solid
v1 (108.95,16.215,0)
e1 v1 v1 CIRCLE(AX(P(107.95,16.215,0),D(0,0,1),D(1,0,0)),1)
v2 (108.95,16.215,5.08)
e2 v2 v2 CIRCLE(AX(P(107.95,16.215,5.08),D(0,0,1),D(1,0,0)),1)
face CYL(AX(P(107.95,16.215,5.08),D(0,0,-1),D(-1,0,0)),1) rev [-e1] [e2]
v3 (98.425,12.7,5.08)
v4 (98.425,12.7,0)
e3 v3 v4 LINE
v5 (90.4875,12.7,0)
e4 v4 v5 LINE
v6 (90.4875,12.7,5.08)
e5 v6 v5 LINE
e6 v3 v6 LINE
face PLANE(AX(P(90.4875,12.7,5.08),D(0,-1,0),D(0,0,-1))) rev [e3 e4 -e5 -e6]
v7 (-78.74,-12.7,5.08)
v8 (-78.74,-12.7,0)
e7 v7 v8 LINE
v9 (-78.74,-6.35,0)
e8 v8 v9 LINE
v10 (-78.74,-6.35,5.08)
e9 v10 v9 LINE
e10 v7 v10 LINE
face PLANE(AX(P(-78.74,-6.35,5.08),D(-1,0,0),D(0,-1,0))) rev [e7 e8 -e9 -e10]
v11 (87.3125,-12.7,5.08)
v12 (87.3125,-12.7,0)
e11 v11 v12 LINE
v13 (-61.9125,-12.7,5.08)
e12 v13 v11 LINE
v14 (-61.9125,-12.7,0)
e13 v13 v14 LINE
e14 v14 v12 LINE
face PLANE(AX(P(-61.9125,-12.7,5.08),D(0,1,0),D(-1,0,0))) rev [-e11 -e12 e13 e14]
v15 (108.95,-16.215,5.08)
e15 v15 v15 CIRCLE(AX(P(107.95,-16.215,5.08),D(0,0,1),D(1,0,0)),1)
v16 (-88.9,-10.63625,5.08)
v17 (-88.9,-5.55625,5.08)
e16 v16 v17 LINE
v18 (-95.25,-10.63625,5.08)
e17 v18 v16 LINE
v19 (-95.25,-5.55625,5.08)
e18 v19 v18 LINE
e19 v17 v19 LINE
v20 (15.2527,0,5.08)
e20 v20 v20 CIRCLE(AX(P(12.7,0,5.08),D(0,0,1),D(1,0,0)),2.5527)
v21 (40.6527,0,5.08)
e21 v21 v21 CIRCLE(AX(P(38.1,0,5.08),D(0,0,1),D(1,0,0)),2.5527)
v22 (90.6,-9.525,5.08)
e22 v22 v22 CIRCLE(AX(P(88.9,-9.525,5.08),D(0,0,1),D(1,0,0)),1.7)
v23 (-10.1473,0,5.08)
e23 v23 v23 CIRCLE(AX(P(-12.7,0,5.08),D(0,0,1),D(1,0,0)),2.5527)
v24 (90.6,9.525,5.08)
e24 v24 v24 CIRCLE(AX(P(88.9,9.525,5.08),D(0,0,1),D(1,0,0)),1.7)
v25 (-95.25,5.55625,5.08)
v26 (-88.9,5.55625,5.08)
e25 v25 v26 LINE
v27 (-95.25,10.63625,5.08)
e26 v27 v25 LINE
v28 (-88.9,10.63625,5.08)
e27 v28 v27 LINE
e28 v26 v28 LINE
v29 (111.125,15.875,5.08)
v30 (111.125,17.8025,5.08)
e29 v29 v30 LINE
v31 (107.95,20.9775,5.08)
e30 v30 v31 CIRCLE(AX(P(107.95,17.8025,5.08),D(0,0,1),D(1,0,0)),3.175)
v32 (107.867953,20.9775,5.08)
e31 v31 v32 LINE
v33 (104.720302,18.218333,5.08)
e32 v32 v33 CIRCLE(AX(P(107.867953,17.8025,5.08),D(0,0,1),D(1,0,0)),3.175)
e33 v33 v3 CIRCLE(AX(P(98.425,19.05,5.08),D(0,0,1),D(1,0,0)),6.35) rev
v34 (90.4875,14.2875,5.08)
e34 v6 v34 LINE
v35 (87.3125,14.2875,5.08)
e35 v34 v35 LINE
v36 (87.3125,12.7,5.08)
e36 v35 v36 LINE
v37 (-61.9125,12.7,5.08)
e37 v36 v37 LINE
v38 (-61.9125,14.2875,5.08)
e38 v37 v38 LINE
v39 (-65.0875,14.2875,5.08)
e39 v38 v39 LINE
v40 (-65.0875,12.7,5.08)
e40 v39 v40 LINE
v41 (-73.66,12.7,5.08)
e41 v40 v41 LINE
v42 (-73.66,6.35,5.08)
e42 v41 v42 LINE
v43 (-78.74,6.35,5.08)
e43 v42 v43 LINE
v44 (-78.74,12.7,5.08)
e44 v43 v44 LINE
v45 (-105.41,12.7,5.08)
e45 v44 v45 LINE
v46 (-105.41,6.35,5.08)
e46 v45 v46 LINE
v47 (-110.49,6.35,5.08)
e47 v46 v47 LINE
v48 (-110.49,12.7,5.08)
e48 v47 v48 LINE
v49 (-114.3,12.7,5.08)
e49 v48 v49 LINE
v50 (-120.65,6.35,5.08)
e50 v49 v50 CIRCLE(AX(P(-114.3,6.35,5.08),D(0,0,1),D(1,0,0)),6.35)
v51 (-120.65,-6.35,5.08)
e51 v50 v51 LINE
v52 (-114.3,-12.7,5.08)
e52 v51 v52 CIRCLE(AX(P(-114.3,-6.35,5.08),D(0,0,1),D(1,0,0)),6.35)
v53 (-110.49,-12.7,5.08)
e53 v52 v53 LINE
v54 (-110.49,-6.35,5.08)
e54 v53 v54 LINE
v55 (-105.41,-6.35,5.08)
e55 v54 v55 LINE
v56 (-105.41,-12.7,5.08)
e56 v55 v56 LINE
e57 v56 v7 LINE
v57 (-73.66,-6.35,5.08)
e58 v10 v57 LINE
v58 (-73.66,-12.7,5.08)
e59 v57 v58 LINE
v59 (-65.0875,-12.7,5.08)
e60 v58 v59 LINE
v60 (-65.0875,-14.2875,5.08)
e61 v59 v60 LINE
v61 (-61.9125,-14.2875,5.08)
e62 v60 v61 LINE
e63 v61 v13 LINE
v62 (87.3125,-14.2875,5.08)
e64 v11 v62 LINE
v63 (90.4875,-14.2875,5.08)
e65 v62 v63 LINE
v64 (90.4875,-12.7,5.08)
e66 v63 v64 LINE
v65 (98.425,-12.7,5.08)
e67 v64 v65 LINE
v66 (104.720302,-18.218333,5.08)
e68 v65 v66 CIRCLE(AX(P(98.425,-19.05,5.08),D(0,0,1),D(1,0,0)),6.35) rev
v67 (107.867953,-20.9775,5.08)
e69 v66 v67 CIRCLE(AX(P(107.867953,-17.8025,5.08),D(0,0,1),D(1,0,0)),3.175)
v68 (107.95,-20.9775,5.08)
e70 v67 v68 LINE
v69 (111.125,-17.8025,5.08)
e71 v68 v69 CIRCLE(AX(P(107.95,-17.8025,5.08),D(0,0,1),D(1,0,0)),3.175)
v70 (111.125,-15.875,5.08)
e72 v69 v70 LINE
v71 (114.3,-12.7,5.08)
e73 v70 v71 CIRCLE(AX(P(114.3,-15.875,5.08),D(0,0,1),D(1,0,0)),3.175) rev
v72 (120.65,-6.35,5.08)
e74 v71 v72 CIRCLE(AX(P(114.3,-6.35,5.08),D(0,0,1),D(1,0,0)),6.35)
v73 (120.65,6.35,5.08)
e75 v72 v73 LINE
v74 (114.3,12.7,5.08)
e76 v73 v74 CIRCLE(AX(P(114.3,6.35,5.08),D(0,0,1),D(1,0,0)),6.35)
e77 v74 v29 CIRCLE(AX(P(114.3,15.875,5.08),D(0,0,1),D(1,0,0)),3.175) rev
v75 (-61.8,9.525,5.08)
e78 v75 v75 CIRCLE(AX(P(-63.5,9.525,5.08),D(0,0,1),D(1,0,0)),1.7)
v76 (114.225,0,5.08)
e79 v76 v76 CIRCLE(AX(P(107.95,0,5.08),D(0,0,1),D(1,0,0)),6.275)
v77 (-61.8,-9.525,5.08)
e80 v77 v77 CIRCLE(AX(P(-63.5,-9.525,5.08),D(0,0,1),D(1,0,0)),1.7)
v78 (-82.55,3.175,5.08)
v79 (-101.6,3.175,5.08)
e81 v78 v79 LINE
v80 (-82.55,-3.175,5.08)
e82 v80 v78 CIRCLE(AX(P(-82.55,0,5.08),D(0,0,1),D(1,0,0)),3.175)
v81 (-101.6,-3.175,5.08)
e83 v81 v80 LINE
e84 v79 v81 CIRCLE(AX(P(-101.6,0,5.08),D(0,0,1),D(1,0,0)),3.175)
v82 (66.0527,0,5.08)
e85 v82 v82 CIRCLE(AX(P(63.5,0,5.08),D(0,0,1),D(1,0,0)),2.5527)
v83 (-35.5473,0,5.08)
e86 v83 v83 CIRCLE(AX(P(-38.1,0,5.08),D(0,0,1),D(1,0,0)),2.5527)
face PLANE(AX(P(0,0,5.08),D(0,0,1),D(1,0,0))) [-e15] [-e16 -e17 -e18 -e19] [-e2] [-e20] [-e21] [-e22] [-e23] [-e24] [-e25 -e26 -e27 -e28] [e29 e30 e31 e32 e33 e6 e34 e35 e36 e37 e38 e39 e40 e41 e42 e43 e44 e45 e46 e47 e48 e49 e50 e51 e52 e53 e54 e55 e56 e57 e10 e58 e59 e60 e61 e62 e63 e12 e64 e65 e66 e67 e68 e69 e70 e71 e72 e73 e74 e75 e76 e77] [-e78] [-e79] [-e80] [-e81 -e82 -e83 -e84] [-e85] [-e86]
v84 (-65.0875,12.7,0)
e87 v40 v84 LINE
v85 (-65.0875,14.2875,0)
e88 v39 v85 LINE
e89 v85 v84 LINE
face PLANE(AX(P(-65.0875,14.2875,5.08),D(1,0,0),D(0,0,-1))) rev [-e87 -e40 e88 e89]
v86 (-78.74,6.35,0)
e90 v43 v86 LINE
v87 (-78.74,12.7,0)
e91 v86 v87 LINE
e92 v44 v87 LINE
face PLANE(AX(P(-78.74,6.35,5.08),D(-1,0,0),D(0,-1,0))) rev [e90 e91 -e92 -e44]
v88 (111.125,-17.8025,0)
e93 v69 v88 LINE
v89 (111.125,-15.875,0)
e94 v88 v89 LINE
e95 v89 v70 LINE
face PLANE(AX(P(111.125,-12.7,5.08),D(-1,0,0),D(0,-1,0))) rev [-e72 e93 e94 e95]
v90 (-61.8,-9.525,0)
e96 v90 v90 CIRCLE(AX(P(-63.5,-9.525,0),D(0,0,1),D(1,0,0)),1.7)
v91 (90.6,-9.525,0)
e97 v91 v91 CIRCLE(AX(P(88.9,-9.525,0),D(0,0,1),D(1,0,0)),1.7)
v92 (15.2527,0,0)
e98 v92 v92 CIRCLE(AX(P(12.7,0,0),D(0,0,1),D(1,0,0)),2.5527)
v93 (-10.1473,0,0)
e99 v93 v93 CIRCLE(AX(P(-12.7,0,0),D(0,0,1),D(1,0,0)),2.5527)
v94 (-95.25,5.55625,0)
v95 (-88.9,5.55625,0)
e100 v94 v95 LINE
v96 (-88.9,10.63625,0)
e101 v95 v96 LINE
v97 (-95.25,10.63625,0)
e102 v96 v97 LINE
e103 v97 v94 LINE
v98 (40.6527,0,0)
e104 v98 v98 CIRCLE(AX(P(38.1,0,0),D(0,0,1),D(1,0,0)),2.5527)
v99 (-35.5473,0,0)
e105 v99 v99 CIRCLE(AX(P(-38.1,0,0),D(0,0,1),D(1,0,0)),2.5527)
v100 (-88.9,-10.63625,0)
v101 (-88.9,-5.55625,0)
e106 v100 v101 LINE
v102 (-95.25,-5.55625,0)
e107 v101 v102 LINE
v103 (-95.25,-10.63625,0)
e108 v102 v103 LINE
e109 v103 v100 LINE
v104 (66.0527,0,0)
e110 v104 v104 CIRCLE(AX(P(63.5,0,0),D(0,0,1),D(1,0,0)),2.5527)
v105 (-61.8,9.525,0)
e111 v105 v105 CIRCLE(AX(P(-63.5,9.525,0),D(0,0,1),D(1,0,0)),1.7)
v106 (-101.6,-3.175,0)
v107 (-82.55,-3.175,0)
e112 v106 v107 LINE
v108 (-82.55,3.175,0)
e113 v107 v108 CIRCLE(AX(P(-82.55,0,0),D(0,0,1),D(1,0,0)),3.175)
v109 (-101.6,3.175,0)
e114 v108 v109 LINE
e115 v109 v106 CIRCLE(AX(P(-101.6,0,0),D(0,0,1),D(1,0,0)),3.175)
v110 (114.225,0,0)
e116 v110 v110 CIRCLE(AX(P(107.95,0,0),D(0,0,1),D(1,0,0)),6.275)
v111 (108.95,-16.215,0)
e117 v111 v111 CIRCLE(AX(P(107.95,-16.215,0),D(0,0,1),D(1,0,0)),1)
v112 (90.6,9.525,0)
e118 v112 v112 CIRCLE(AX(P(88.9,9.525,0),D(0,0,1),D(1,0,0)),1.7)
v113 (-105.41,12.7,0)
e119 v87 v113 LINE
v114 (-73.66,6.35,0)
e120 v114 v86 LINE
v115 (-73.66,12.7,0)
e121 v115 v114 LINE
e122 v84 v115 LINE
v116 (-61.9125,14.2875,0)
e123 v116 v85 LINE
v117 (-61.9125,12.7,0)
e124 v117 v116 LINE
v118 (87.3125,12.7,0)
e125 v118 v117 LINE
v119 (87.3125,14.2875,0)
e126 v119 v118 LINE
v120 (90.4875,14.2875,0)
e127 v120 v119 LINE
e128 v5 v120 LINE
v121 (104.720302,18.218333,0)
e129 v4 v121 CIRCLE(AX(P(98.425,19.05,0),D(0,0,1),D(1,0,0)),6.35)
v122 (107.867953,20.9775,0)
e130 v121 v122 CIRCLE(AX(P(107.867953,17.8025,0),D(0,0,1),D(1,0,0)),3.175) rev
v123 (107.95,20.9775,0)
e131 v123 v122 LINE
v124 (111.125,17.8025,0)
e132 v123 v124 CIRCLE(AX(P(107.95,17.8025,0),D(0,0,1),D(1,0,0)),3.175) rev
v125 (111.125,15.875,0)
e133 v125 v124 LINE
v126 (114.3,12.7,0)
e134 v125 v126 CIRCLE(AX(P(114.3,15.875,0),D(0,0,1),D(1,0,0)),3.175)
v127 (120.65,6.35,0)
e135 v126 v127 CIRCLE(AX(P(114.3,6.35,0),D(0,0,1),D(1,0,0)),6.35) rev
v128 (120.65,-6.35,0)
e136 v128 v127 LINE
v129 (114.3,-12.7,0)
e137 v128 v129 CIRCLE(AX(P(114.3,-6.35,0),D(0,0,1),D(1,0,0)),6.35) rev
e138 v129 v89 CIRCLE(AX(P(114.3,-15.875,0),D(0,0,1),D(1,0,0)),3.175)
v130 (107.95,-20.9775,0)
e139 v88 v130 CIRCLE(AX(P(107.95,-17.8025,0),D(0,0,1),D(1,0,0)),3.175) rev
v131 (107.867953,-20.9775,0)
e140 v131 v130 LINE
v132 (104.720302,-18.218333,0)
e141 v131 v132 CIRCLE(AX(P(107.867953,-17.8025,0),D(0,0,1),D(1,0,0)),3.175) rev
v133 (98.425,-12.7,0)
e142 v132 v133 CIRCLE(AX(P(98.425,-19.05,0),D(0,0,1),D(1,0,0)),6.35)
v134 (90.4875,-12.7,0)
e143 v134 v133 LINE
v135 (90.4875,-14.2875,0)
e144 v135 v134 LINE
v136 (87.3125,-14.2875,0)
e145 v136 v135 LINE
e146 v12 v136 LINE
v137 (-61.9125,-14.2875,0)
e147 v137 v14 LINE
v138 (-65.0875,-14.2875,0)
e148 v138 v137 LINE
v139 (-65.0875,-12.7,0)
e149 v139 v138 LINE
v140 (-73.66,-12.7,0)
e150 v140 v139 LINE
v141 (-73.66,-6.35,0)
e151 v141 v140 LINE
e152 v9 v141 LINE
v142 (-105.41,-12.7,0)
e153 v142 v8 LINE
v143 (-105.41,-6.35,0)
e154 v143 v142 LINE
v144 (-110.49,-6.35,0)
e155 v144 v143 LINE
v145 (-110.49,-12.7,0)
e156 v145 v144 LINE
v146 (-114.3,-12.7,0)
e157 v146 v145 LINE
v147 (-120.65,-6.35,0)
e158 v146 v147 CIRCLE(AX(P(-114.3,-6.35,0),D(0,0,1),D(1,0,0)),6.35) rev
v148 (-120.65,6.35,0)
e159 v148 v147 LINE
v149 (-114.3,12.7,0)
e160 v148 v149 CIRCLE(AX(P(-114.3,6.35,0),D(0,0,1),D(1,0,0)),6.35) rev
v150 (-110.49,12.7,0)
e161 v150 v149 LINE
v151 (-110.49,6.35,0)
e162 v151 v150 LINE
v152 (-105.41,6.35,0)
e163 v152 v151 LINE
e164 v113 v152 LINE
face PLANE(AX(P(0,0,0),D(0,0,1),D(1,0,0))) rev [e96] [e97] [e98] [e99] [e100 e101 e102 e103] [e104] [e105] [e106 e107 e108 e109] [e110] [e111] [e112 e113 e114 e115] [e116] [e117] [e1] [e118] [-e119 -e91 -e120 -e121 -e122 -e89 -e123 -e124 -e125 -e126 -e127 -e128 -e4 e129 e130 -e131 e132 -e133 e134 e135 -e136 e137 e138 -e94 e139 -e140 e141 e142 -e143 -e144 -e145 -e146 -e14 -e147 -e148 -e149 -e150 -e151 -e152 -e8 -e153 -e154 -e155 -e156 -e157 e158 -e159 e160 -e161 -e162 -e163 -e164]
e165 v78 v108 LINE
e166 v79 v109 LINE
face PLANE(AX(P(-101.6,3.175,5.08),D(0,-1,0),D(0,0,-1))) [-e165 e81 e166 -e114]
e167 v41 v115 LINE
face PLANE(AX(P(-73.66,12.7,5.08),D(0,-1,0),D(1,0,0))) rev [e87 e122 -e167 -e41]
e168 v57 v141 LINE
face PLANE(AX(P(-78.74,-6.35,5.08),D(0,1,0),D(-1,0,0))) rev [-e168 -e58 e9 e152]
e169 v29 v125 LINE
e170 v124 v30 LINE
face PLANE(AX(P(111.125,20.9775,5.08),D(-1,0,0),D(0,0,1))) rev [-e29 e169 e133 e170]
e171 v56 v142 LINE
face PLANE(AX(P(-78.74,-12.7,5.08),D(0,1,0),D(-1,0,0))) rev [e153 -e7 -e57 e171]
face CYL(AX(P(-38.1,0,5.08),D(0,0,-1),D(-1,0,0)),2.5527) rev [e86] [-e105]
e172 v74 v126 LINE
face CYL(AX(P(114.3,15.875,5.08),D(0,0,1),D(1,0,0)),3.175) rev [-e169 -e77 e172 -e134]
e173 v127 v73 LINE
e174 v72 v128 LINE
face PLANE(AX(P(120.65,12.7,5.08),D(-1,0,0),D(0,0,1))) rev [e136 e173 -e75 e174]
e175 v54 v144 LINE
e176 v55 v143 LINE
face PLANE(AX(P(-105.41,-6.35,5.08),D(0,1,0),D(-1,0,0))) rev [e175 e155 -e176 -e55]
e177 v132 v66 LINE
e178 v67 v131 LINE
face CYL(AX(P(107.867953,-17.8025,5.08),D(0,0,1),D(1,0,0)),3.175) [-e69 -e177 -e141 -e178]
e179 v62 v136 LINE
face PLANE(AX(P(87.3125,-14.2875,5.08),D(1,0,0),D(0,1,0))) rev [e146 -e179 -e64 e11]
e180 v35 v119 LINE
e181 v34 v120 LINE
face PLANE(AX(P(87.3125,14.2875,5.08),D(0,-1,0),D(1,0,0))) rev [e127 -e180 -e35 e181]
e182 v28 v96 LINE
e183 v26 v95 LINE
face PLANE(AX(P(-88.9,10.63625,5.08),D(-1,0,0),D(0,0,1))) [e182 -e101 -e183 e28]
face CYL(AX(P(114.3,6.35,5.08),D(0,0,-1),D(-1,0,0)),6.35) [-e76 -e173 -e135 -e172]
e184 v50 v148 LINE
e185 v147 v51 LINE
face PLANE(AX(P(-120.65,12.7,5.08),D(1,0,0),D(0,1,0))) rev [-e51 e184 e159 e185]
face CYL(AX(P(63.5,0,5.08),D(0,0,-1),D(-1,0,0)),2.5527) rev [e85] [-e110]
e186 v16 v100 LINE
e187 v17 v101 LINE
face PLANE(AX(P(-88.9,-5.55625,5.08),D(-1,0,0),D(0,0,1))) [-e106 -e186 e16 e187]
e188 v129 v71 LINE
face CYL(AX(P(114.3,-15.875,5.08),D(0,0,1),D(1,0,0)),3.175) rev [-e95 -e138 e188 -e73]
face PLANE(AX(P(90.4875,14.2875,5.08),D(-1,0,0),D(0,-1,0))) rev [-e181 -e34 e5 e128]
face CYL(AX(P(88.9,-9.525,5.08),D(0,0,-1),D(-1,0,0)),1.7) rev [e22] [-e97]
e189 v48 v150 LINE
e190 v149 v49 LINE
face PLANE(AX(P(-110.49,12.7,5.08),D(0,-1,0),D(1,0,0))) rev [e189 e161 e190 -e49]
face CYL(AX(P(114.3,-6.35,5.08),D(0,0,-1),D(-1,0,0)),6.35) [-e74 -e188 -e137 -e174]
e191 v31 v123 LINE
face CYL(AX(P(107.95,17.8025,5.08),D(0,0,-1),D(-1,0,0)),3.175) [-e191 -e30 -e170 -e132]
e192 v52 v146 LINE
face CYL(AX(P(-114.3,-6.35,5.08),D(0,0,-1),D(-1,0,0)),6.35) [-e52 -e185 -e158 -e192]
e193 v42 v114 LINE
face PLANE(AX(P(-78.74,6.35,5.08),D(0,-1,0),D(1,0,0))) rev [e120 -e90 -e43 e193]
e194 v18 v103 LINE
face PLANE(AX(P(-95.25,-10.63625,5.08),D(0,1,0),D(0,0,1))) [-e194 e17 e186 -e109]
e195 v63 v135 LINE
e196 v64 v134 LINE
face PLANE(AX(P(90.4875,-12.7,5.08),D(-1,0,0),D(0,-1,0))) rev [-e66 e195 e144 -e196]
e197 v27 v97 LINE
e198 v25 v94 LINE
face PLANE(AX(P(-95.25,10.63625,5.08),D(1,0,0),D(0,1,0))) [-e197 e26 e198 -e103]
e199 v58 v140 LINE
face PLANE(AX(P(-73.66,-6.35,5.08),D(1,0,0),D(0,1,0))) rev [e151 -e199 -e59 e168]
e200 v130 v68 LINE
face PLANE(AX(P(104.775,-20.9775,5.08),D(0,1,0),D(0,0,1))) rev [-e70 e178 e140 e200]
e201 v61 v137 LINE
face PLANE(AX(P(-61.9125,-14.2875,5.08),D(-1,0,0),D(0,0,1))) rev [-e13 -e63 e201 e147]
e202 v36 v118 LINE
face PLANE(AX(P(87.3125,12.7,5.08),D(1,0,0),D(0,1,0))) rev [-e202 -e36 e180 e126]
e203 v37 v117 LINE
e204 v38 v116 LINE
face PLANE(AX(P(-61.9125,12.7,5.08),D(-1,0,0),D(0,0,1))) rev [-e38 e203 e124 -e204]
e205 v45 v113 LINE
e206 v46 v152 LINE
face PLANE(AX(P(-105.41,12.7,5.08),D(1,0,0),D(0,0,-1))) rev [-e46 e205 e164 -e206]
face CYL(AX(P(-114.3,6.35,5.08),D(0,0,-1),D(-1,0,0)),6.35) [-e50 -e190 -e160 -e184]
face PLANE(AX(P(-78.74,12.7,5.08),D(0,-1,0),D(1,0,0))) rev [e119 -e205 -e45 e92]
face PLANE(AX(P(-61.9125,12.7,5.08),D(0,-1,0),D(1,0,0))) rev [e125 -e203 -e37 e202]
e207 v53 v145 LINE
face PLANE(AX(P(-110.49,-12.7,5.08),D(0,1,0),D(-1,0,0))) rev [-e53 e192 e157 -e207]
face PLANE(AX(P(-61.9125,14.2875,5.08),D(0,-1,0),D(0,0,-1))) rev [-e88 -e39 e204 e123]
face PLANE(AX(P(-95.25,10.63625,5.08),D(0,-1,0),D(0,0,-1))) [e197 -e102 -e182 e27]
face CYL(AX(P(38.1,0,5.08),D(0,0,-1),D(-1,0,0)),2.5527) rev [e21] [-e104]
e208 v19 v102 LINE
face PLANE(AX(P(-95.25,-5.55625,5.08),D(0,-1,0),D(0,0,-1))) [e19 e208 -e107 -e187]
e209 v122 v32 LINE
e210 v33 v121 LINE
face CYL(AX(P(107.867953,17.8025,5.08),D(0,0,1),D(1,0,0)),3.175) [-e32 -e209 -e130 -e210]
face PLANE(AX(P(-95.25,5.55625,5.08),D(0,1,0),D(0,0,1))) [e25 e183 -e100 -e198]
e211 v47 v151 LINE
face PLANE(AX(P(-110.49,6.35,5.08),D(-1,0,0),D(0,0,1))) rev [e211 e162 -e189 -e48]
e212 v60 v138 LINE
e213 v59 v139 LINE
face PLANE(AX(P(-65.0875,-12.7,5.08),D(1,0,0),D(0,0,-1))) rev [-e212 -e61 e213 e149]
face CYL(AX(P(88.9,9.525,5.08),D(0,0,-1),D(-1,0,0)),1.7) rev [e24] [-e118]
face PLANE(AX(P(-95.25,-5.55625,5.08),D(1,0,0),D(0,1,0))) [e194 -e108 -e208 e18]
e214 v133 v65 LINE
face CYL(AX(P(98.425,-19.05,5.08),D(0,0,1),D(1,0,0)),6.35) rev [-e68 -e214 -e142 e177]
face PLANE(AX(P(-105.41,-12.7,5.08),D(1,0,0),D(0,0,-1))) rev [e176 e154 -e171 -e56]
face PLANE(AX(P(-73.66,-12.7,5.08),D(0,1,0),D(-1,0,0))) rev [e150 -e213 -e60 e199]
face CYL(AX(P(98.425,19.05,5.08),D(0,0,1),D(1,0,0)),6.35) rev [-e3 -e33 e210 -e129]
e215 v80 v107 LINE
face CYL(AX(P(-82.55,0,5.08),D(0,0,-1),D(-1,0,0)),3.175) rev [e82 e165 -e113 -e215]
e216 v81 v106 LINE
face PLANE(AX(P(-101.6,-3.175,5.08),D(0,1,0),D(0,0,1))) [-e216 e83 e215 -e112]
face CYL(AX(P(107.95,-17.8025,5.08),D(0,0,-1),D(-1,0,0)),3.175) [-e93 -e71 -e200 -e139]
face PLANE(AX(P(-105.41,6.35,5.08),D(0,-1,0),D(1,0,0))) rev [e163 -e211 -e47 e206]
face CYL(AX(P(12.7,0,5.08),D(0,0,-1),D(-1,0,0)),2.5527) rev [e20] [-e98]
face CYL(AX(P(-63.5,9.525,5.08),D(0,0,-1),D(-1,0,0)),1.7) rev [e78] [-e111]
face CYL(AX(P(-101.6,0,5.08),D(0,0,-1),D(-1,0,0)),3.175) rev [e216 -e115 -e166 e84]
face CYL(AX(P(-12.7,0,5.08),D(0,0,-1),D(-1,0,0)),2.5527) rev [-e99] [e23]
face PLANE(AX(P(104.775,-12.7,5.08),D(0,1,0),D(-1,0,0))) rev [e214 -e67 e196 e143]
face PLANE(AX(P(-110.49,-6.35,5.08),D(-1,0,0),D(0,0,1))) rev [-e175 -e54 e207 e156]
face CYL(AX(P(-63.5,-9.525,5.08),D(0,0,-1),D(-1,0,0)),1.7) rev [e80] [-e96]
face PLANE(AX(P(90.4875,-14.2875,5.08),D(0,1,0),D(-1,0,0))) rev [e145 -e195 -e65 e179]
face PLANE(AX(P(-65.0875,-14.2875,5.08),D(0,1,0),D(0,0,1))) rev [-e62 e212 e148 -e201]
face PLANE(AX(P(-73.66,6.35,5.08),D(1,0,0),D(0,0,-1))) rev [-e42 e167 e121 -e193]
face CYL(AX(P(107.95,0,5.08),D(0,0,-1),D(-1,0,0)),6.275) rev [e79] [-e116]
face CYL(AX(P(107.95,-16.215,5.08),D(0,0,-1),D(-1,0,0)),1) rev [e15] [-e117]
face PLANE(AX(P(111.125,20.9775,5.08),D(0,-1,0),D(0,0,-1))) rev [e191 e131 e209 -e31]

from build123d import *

# Parameters (mm, degrees)
SKETCH2_W           = 6.35
SKETCH2_H           = 5.08
SKETCH2_R           = 1.7
SKETCH2_R_2         = 2.5527
SKETCH2_R_3         = 1
SKETCH2_R_4         = 6.275
BOSS_EXTRUDE1_DEPTH = 5.08
FILLET1_R           = 6.35
FILLET2_R           = 3.175


with BuildPart() as part:
    # Sketch2 → Boss-Extrude1 (new body)
    with BuildSketch(Plane.XY):
        Polygon((-110.49, 12.7), (-120.65, 12.7), (-120.65, -12.7), (-110.49, -12.7), (-110.49, -6.35), (-105.41, -6.35), (-105.41, -12.7), (-78.74, -12.7), (-78.74, -6.35), (-73.66, -6.35), (-73.66, -12.7), (-65.0875, -12.7), (-65.0875, -14.2875), (-61.9125, -14.2875), (-61.9125, -12.7), (87.3125, -12.7), (87.3125, -14.2875), (90.4875, -14.2875), (90.4875, -12.7), (104.775, -12.7), (104.775, -20.9775), (111.125, -20.9775), (111.125, -12.7), (120.65, -12.7), (120.65, 12.7), (111.125, 12.7), (111.125, 20.9775), (104.775, 20.9775), (104.775, 12.7), (90.4875, 12.7), (90.4875, 14.2875), (87.3125, 14.2875), (87.3125, 12.7), (-61.9125, 12.7), (-61.9125, 14.2875), (-65.0875, 14.2875), (-65.0875, 12.7), (-73.66, 12.7), (-73.66, 6.35), (-78.74, 6.35), (-78.74, 12.7), (-105.41, 12.7), (-105.41, 6.35), (-110.49, 6.35), align=None)
        with Locations((-92.075, -8.09625)):
            Rectangle(SKETCH2_W, SKETCH2_H, mode=Mode.SUBTRACT)
        with Locations((-63.5, -9.525)):
            Circle(SKETCH2_R, mode=Mode.SUBTRACT)
        with BuildLine():
            ThreePointArc((-101.6, -3.175), (-104.775, 0), (-101.6, 3.175))
            Line((-101.6, 3.175), (-82.55, 3.175))
            ThreePointArc((-82.55, 3.175), (-79.375, 0), (-82.55, -3.175))
            Line((-82.55, -3.175), (-101.6, -3.175))
        make_face(mode=Mode.SUBTRACT)
        with Locations((-38.1, 0)):
            Circle(SKETCH2_R_2, mode=Mode.SUBTRACT)
        with Locations((-12.7, 0)):
            Circle(SKETCH2_R_2, mode=Mode.SUBTRACT)
        with Locations((107.95, -16.215)):
            Circle(SKETCH2_R_3, mode=Mode.SUBTRACT)
        with Locations((12.7, 0)):
            Circle(SKETCH2_R_2, mode=Mode.SUBTRACT)
        with Locations((38.1, 0)):
            Circle(SKETCH2_R_2, mode=Mode.SUBTRACT)
        with Locations((88.9, -9.525)):
            Circle(SKETCH2_R, mode=Mode.SUBTRACT)
        with Locations((63.5, 0)):
            Circle(SKETCH2_R_2, mode=Mode.SUBTRACT)
        with Locations((107.95, 0)):
            Circle(SKETCH2_R_4, mode=Mode.SUBTRACT)
        with Locations((-92.075, 8.09625)):
            Rectangle(SKETCH2_W, SKETCH2_H, mode=Mode.SUBTRACT)
        with Locations((-63.5, 9.525)):
            Circle(SKETCH2_R, mode=Mode.SUBTRACT)
        with Locations((88.9, 9.525)):
            Circle(SKETCH2_R, mode=Mode.SUBTRACT)
        with Locations((107.95, 16.215)):
            Circle(SKETCH2_R_3, mode=Mode.SUBTRACT)
    extrude(amount=BOSS_EXTRUDE1_DEPTH)

    # Fillet1
    fillet1_edges = [part.edges().sort_by_distance(p)[0] for p in [
        (104.775, 12.7, 2.54),
        (120.65, 12.7, 2.54),
        (120.65, -12.7, 2.54),
        (104.775, -12.7, 2.54),
        (-120.65, -12.7, 2.54),
        (-120.65, 12.7, 2.54),
    ]]
    fillet(fillet1_edges, radius=FILLET1_R)

    # Fillet2
    fillet2_edges = [part.edges().sort_by_distance(p)[0] for p in [
        (104.775, -20.9775, 2.54),
        (111.125, -20.9775, 2.54),
        (111.125, -12.7, 2.54),
        (111.125, 12.7, 2.54),
        (111.125, 20.9775, 2.54),
        (104.775, 20.9775, 2.54),
    ]]
    fillet(fillet2_edges, radius=FILLET2_R - 0.0001)  # a hair under: the kernel refuses the full size


solid = part.part
